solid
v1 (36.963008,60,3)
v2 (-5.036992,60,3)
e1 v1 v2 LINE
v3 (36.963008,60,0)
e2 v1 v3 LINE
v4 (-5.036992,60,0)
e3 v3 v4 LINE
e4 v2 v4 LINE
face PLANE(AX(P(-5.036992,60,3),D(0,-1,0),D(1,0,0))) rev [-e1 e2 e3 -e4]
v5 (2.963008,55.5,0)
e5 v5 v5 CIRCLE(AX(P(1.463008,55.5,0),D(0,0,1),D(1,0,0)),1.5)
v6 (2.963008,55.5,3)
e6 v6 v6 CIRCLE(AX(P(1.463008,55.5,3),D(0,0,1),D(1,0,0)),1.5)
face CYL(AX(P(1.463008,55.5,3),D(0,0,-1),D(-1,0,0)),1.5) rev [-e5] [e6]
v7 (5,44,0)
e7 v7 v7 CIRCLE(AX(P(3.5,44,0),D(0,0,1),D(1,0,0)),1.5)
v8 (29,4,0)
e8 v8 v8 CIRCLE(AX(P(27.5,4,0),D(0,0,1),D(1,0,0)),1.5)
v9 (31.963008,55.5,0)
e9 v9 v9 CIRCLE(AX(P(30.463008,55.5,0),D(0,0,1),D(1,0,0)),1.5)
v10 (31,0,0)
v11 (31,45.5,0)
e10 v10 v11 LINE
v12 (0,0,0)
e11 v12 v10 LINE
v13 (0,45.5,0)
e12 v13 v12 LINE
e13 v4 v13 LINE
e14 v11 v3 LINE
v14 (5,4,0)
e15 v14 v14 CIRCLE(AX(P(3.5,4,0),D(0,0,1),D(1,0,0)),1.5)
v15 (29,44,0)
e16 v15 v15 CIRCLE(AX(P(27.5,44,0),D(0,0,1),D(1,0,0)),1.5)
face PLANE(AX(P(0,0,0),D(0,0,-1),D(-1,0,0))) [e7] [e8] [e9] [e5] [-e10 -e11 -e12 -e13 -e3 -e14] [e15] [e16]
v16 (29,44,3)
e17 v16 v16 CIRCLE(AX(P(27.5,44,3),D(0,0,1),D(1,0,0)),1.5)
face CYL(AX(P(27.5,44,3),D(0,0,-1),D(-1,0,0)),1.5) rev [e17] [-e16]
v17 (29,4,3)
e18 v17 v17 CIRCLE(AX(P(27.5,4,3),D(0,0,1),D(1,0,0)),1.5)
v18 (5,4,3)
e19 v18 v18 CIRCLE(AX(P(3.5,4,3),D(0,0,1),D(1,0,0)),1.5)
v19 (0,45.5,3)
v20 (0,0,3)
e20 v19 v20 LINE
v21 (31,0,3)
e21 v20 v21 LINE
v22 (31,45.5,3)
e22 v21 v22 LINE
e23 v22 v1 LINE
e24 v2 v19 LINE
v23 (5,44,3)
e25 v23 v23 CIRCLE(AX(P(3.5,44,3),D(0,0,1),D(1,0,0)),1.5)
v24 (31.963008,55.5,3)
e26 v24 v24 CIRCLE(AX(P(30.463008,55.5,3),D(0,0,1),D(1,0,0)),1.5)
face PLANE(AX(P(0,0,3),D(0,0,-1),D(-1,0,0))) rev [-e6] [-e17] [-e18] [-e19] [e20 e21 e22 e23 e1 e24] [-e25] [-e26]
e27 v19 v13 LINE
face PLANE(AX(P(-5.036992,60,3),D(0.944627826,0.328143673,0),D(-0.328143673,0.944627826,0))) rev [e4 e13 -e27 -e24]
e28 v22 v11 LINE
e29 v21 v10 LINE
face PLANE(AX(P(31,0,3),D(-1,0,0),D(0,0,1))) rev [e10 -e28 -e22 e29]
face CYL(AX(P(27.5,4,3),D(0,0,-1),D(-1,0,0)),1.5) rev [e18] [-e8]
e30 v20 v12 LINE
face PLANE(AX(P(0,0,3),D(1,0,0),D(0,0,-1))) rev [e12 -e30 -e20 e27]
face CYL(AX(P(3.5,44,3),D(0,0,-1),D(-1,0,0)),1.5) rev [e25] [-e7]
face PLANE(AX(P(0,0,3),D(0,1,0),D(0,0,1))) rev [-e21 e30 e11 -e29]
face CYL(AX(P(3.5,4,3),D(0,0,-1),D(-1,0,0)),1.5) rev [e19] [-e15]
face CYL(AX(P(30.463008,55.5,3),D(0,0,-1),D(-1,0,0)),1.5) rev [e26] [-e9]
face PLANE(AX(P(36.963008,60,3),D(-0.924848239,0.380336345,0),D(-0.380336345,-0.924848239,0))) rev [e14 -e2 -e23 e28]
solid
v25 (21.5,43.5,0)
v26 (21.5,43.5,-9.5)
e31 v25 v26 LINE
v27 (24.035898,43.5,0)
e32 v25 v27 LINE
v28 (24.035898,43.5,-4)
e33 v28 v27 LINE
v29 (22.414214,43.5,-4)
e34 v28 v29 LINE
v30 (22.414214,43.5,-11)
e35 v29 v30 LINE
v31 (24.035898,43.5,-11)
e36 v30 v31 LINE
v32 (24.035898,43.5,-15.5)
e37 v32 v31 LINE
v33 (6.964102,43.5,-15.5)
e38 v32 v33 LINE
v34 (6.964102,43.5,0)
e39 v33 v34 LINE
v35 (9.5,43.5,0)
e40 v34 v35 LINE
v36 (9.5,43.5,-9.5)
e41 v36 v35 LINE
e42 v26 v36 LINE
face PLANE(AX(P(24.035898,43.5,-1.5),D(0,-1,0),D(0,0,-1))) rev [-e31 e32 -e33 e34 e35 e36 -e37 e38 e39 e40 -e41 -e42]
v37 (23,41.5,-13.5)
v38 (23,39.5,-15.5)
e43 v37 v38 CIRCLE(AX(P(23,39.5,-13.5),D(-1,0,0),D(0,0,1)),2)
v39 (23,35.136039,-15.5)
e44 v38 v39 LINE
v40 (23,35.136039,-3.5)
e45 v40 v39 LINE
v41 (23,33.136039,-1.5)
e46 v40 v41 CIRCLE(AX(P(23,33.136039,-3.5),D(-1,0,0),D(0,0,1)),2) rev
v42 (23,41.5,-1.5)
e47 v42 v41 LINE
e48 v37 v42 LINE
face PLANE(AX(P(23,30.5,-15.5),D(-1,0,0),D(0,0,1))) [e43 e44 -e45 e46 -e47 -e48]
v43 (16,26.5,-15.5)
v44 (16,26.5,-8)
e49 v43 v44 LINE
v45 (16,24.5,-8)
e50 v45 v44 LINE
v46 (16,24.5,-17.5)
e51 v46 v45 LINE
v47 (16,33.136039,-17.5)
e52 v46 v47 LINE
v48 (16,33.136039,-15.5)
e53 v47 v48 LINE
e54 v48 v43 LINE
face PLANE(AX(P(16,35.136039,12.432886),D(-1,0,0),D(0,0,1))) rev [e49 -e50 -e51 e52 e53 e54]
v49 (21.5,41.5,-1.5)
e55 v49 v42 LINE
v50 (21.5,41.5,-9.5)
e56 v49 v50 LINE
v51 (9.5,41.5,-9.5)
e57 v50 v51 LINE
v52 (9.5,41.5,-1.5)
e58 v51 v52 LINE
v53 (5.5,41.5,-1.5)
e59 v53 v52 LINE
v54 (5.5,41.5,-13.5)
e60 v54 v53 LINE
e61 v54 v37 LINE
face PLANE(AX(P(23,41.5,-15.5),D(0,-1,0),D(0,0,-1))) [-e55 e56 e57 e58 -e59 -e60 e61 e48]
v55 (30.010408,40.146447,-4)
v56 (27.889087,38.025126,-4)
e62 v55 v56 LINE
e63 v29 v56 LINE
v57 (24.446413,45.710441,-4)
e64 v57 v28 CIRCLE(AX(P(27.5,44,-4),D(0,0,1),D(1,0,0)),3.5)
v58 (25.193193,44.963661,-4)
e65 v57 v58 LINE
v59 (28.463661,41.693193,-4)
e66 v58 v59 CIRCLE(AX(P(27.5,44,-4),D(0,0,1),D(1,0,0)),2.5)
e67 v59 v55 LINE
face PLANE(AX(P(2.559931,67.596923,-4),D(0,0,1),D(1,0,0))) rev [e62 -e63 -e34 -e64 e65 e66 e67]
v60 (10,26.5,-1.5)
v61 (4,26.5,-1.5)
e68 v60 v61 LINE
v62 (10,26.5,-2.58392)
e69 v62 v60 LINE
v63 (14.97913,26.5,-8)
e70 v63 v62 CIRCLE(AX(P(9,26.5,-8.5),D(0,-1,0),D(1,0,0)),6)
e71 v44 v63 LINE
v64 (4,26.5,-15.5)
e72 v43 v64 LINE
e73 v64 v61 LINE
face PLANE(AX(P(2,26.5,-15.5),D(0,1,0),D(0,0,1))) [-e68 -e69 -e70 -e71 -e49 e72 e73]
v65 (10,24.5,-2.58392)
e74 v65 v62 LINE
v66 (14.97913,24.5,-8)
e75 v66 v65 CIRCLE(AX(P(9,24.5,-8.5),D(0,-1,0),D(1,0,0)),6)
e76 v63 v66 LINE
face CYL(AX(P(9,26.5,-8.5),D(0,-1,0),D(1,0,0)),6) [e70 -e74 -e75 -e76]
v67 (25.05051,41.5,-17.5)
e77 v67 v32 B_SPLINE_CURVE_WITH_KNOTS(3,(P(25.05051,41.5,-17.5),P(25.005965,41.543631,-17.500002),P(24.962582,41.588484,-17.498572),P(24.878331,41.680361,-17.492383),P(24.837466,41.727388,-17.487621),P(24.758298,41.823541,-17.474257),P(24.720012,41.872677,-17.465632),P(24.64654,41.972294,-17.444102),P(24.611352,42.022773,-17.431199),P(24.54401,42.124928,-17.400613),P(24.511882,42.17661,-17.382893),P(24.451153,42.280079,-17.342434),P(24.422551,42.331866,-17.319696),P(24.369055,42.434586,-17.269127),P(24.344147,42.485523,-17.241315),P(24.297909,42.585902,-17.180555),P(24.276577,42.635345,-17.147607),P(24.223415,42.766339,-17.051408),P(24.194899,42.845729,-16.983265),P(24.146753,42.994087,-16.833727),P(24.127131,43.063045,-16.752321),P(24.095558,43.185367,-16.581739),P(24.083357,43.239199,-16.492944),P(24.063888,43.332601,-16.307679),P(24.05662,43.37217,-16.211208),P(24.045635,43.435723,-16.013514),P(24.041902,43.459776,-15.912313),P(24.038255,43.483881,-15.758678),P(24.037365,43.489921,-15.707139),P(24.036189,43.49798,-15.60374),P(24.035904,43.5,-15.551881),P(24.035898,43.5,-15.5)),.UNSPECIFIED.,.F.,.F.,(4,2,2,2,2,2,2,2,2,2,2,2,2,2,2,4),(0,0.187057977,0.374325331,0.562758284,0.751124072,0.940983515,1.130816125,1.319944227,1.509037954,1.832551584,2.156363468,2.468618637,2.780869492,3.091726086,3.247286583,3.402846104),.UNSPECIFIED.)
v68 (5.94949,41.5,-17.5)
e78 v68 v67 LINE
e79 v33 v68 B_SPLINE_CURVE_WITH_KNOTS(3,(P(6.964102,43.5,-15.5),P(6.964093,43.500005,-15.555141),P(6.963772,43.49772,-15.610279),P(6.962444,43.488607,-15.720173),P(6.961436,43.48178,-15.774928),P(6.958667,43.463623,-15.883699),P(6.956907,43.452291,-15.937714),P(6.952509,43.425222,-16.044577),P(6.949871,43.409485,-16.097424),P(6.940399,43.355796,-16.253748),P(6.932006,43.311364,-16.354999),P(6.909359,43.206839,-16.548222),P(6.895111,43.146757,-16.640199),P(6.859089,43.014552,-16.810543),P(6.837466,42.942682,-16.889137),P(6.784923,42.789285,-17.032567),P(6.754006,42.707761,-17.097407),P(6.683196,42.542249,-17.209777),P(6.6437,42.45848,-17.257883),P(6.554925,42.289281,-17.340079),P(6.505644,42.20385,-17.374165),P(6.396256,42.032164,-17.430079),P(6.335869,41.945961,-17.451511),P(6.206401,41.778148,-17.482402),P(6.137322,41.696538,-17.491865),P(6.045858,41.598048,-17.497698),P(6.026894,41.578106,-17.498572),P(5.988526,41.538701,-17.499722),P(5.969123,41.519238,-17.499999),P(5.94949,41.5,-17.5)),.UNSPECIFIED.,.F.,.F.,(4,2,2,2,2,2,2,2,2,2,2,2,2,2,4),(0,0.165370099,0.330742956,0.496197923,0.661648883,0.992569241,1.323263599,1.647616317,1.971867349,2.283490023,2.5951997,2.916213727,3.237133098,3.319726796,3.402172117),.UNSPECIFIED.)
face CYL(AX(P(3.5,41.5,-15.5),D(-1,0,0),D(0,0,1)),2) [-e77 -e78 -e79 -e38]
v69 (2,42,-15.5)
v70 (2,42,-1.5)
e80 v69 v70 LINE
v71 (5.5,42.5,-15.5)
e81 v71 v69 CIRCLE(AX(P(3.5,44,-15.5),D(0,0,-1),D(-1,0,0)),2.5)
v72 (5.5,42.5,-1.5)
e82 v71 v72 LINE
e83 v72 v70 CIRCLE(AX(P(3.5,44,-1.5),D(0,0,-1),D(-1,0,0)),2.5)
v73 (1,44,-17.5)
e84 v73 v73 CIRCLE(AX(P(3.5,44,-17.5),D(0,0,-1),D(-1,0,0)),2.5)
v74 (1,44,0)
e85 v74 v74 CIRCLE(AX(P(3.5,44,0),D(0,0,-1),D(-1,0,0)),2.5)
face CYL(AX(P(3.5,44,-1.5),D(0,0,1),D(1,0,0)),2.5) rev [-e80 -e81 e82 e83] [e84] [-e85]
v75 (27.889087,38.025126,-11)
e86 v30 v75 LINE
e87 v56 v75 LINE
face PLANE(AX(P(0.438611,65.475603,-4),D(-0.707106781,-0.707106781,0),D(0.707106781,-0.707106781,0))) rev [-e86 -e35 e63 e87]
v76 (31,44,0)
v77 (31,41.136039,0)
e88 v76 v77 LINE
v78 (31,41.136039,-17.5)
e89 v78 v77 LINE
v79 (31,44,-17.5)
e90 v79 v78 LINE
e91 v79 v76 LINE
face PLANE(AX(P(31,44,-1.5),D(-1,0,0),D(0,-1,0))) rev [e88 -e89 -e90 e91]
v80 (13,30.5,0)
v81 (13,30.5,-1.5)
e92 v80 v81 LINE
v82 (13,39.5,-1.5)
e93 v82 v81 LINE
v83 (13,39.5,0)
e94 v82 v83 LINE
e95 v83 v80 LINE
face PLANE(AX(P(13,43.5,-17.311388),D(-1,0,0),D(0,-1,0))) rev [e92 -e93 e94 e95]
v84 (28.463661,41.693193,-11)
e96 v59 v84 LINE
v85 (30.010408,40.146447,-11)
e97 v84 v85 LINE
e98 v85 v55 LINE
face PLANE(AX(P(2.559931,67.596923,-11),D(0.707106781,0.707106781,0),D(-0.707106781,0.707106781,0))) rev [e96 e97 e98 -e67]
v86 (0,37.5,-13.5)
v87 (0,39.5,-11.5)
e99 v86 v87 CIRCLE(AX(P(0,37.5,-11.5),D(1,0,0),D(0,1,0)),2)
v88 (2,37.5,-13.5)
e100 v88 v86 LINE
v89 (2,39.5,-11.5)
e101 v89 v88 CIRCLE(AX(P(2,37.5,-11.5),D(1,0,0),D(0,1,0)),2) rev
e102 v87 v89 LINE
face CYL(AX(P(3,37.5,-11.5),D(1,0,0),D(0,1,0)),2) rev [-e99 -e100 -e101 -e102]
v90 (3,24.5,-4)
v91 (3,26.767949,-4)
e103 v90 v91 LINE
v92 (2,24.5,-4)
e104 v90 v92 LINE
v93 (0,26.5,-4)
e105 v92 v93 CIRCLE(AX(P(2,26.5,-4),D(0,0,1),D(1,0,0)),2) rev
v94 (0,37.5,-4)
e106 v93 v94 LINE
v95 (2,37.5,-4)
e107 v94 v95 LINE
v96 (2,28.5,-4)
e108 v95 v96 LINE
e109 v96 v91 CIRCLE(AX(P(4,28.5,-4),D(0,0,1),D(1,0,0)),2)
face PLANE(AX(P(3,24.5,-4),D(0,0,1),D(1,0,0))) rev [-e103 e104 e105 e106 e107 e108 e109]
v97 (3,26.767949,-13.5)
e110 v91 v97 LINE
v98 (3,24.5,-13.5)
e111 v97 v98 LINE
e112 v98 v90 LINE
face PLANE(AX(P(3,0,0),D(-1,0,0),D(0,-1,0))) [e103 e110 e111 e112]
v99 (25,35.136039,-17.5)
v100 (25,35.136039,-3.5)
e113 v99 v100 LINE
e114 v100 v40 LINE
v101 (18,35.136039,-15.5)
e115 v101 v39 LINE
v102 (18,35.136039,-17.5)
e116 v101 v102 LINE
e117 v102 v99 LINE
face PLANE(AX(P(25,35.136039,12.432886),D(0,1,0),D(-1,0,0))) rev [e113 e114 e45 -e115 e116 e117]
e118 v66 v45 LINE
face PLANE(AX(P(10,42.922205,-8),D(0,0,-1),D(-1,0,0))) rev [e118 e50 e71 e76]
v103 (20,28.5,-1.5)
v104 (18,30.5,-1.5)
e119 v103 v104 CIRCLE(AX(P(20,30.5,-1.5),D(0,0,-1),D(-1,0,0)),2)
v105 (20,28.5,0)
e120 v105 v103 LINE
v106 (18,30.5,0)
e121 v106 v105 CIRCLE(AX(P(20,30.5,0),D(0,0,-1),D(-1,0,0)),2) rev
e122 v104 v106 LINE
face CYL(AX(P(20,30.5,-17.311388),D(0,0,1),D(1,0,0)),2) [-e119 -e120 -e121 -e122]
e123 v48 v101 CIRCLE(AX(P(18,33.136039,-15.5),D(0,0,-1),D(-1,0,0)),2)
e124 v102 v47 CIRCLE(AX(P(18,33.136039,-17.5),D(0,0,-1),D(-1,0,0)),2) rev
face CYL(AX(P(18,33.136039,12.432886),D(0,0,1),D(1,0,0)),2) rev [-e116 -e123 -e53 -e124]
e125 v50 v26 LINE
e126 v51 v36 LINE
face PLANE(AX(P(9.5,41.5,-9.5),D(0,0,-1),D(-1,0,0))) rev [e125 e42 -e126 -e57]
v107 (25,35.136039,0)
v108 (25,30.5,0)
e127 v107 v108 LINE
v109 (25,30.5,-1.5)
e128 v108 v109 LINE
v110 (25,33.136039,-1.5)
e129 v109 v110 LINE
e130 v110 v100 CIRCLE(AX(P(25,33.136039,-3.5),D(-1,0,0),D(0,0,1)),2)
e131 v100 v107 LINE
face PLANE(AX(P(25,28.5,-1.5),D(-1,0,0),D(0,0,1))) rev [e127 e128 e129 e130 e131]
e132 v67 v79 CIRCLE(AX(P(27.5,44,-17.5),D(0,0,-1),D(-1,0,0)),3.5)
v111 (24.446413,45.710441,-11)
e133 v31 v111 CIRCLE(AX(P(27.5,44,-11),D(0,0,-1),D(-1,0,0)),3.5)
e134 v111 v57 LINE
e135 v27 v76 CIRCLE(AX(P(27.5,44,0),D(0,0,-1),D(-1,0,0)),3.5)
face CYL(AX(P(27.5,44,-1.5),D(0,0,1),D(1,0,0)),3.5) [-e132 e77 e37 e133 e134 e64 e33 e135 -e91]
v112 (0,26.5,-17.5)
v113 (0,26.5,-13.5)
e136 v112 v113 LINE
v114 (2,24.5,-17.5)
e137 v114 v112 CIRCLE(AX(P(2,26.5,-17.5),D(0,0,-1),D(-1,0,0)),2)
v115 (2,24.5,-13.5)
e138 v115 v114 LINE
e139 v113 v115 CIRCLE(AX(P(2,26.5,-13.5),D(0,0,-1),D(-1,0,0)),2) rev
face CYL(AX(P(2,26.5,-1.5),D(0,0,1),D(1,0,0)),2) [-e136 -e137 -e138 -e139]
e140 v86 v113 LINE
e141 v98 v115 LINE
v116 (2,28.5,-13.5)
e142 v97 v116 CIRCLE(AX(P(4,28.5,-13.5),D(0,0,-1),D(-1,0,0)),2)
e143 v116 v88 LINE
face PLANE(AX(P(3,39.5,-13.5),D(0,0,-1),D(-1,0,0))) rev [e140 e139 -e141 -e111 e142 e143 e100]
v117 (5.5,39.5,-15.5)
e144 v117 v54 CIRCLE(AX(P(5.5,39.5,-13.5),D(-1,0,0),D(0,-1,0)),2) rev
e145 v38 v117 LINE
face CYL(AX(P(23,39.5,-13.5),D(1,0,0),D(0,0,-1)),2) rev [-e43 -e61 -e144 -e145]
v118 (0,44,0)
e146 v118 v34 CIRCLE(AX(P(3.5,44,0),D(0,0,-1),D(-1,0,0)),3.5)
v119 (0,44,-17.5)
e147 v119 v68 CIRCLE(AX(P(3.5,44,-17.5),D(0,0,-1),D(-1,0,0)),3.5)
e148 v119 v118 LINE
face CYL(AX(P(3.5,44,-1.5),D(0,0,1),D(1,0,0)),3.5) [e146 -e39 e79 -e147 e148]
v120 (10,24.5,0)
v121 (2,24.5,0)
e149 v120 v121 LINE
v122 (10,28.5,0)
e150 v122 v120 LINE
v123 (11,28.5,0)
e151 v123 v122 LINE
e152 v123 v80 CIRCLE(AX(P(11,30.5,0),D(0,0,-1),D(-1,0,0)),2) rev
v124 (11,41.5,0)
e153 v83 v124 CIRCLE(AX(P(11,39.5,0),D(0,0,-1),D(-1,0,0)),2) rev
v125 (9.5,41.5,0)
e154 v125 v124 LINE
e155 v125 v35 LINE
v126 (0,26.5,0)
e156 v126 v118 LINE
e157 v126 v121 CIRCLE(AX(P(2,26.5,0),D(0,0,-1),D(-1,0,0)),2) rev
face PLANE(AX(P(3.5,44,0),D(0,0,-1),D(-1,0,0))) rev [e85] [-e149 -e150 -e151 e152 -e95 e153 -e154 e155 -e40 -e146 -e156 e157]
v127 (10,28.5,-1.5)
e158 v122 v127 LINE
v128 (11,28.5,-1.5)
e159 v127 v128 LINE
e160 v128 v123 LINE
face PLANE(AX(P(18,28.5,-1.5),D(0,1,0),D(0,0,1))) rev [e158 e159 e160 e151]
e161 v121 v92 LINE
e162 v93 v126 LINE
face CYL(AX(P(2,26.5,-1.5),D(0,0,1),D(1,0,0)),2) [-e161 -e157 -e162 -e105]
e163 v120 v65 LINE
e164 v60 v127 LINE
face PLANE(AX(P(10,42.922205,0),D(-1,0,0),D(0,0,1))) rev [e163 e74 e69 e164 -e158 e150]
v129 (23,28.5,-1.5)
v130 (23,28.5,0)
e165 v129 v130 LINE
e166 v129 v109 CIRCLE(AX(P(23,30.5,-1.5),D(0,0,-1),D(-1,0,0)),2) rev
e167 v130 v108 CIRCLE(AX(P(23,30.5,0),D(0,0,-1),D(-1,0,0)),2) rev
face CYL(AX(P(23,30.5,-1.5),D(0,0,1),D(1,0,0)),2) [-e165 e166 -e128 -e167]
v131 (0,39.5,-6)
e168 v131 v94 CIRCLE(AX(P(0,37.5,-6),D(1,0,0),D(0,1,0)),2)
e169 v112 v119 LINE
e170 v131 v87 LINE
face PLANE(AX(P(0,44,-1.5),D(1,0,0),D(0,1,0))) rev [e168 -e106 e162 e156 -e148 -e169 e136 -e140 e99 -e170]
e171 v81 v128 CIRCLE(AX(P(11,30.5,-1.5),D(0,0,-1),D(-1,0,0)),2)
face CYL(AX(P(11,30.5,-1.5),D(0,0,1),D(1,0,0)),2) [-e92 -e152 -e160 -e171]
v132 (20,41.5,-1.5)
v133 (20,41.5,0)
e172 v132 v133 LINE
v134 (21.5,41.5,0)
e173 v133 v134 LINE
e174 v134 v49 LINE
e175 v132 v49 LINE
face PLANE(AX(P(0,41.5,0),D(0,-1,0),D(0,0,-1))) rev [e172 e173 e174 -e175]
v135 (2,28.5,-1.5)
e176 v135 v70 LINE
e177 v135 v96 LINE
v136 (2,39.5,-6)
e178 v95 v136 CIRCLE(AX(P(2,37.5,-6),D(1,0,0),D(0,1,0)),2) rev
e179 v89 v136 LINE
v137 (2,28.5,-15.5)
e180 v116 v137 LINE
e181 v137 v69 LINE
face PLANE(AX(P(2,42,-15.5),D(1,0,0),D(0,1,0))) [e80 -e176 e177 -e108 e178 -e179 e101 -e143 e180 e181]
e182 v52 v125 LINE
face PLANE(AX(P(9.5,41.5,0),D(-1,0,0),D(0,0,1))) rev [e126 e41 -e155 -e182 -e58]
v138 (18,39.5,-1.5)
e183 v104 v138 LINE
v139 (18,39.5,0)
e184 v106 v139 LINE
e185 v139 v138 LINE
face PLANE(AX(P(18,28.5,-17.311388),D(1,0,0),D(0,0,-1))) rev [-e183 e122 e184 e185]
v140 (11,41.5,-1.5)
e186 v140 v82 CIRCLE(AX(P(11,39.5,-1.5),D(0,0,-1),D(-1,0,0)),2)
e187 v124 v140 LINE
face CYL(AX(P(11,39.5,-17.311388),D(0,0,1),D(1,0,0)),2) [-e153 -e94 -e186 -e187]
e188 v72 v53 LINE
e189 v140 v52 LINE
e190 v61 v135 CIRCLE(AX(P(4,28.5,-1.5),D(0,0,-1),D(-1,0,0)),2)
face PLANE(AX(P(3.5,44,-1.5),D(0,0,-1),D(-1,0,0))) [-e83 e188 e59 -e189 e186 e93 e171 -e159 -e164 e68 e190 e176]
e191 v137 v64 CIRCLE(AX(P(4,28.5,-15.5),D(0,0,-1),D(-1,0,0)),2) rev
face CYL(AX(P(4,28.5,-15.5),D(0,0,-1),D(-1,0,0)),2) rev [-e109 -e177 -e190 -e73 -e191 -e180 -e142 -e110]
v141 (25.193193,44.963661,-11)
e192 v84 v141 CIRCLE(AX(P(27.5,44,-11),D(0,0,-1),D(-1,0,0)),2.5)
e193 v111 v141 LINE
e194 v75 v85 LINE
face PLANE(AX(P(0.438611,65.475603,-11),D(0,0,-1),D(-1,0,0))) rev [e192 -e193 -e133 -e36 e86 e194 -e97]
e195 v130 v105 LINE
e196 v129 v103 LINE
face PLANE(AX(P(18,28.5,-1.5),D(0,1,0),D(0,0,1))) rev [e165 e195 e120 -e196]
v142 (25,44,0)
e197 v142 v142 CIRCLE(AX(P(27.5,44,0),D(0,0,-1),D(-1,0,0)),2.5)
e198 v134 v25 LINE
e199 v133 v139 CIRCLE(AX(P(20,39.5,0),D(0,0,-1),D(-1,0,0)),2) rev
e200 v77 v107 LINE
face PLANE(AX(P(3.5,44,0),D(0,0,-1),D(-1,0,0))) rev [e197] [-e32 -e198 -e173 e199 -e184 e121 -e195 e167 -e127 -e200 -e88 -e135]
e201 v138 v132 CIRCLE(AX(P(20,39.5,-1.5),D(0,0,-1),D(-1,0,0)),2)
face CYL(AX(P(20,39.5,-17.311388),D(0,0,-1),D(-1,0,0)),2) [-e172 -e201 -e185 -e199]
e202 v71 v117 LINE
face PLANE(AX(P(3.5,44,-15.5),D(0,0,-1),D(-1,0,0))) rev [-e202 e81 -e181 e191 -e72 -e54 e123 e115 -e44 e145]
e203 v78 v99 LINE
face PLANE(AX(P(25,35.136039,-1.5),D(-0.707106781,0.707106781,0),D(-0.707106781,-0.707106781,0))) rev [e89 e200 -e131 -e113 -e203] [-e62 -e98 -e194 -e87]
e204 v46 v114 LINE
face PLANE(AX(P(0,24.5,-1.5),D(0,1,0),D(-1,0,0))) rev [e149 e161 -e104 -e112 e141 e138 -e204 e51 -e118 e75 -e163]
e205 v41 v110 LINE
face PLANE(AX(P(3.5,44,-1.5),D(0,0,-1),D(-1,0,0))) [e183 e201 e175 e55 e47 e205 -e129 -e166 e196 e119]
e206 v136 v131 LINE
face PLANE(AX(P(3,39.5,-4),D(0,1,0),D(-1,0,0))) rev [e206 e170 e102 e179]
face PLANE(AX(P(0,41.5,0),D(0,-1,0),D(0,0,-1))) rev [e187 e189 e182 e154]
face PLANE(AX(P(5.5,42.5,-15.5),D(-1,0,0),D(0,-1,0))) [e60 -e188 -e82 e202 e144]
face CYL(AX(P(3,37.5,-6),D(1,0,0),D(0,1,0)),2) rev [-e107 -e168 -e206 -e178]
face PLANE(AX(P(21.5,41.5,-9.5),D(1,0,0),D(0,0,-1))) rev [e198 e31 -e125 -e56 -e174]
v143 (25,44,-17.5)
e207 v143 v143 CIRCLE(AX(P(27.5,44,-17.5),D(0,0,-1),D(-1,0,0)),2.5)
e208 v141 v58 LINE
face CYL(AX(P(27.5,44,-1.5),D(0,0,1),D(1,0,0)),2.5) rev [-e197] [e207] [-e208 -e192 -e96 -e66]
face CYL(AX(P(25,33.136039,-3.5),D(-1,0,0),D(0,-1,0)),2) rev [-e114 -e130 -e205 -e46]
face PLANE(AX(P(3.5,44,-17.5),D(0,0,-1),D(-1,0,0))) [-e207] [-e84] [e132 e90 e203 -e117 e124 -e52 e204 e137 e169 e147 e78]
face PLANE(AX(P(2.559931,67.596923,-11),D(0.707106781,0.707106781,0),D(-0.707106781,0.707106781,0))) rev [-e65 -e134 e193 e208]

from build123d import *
from build123d.topology import SkipClean

# Parameters (mm, degrees)
SKETCH1_R           = 1.5
BOSS_EXTRUDE1_DEPTH = 3
SKETCH2_R           = 2.5
BOSS_EXTRUDE2_DEPTH = 1.5
SKETCH5_R           = 2.5
BOSS_EXTRUDE5_DEPTH = 14
SKETCH6_R           = 2.5
BOSS_EXTRUDE6_DEPTH = 2
SKETCH8_W           = 9.5
SKETCH8_H           = 15
CUT_EXTRUDE1_DEPTH  = 3
CUT_EXTRUDE2_REACH  = 56.155
SKETCH9_W           = 12
SKETCH9_H           = 8
SKETCH11_W          = 8
SKETCH11_H          = 4
CUT_EXTRUDE4_DEPTH  = 2
SKETCH13_W          = 5
SKETCH13_H          = 15
CUT_EXTRUDE7_DEPTH  = 1.5
SKETCH15_W          = 12
SKETCH15_H          = 9.5
CUT_EXTRUDE8_DEPTH  = 2
SKETCH16_W          = 7
SKETCH16_H          = 3
CUT_EXTRUDE9_DEPTH  = 72.346897019
FILLET1_R           = 2
CUT_EXTRUDE11_REACH = 75.393
SKETCH21_W          = 9
SKETCH21_H          = 10.636038969
SKETCH23_R          = 6
BOSS_EXTRUDE7_DEPTH = 2
FILLET2_R           = 2


with BuildPart() as part:
    # Sketch1 → Boss-Extrude1 (new body)
    with BuildSketch(Plane.XY):
        Polygon((0, 0), (31, 0), (31, 45.5), (36.963007518, 60), (-5.036992482, 60), (0, 45.5), align=None)
        with Locations((30.463007518, 55.5)):
            Circle(SKETCH1_R, mode=Mode.SUBTRACT)
        with Locations((27.5, 44)):
            Circle(SKETCH1_R, mode=Mode.SUBTRACT)
        with Locations((27.5, 4)):
            Circle(SKETCH1_R, mode=Mode.SUBTRACT)
        with Locations((3.5, 4)):
            Circle(SKETCH1_R, mode=Mode.SUBTRACT)
        with Locations((3.5, 44)):
            Circle(SKETCH1_R, mode=Mode.SUBTRACT)
        with Locations((1.463007518, 55.5)):
            Circle(SKETCH1_R, mode=Mode.SUBTRACT)
    extrude(amount=BOSS_EXTRUDE1_DEPTH)


with BuildPart() as body_2:
    # Sketch2 → Boss-Extrude2 (new body)
    with BuildSketch(Plane(origin=(0, 0, 0), x_dir=(-1, 0, 0), z_dir=(0, 0, -1))):
        with BuildLine():
            Line((0, 24.5), (0, 44))
            ThreePointArc((0, 44), (-3.750643519, 47.491013868), (-6.964101615, 43.5))
            Line((-6.964101615, 43.5), (-24.035898385, 43.5))
            ThreePointArc((-24.035898385, 43.5), (-27.249356481, 47.491013868), (-31, 44))
            Line((-31, 44), (-31, 41.136038969))
            Line((-31, 41.136038969), (-25, 35.136038969))
            Line((-25, 35.136038969), (-25, 28.5))
            Line((-25, 28.5), (-18, 28.5))
            Line((-18, 28.5), (-18, 24.5))
            Line((-18, 24.5), (0, 24.5))
        make_face()
        with Locations((-27.5, 44)):
            Circle(SKETCH2_R, mode=Mode.SUBTRACT)
        with Locations((-3.5, 44)):
            Circle(SKETCH2_R, mode=Mode.SUBTRACT)
    extrude(amount=BOSS_EXTRUDE2_DEPTH)

    # Sketch5 → Boss-Extrude5 (add)
    with SkipClean():  # the faces are left unmerged after this step: merging them gives an invalid solid
        with BuildSketch(Plane(origin=(0, 0, -1.5), x_dir=(-1, 0, 0), z_dir=(0, 0, -1))):
            with BuildLine():
                Line((-6.964101615, 43.5), (-24.035898385, 43.5))
                ThreePointArc((-24.035898385, 43.5), (-27.249356481, 47.491013868), (-31, 44))
                Line((-31, 44), (-31, 41.136038969))
                Line((-31, 41.136038969), (-25, 35.136038969))
                Line((-25, 35.136038969), (-25, 28.5))
                Line((-25, 28.5), (-18, 28.5))
                Line((-18, 28.5), (-18, 24.5))
                Line((-18, 24.5), (0, 24.5))
                Line((0, 24.5), (0, 44))
                ThreePointArc((0, 44), (-3.750643519, 47.491013868), (-6.964101615, 43.5))
            make_face()
            with Locations((-27.5, 44)):
                Circle(SKETCH5_R, mode=Mode.SUBTRACT)
            with BuildLine():
                Line((-23, 41.5), (-5.5, 41.5))
                Line((-5.5, 41.5), (-5.5, 42.5))
                ThreePointArc((-5.5, 42.5), (-3.146446609, 46.474873734), (-2, 42))
                Line((-2, 42), (-2, 26.5))
                Line((-2, 26.5), (-16, 26.5))
                Line((-16, 26.5), (-16, 30.5))
                Line((-16, 30.5), (-23, 30.5))
                Line((-23, 30.5), (-23, 41.5))
            make_face(mode=Mode.SUBTRACT)
        extrude(amount=BOSS_EXTRUDE5_DEPTH)

    # Sketch6 → Boss-Extrude6 (add)
    with SkipClean():  # the faces are left unmerged after this step: merging them gives an invalid solid
        with BuildSketch(Plane(origin=(0, 0, -15.5), x_dir=(-1, 0, 0), z_dir=(0, 0, -1))):
            with BuildLine():
                Line((-6.964101615, 43.5), (-24.035898385, 43.5))
                ThreePointArc((-24.035898385, 43.5), (-27.249356481, 47.491013868), (-31, 44))
                Line((-31, 44), (-31, 41.136038969))
                Line((-31, 41.136038969), (-25, 35.136038969))
                Line((-25, 35.136038969), (-25, 28.5))
                Line((-25, 28.5), (-18, 28.5))
                Line((-18, 28.5), (-18, 24.5))
                Line((-18, 24.5), (0, 24.5))
                Line((0, 24.5), (0, 44))
                ThreePointArc((0, 44), (-3.750643519, 47.491013868), (-6.964101615, 43.5))
            make_face()
            with Locations((-3.5, 44)):
                Circle(SKETCH6_R, mode=Mode.SUBTRACT)
            with Locations((-27.5, 44)):
                Circle(SKETCH6_R, mode=Mode.SUBTRACT)
        extrude(amount=BOSS_EXTRUDE6_DEPTH)

    # Sketch8 → Cut-Extrude1 (cut)
    with SkipClean():  # the faces are left unmerged after this step: merging them gives an invalid solid
        with BuildSketch(Plane.ZY):
            with Locations((-8.75, 32)):
                Rectangle(SKETCH8_W, SKETCH8_H)
        extrude(amount=-CUT_EXTRUDE1_DEPTH, mode=Mode.SUBTRACT)

    # Cut-Extrude2: up to this face of the body (flat: up to its plane)
    cut_extrude2_end = Plane(body_2.part.faces().sort_by_distance((21.5, 28.5, -8.5))[0])
    # Sketch9 → Cut-Extrude2 (cut, up to the picked face)
    with BuildSketch(Plane.XZ.offset(-24.5), mode=Mode.PRIVATE) as cut_extrude2_sk1:
        with Locations((16, -4)):
            Rectangle(SKETCH9_W, SKETCH9_H)
    cut_extrude2_tool1 = split(extrude(cut_extrude2_sk1.sketch, amount=-CUT_EXTRUDE2_REACH, mode=Mode.PRIVATE), bisect_by=cut_extrude2_end, keep=Keep.BOTH, mode=Mode.PRIVATE)
    add(cut_extrude2_tool1.solids().sort_by(Axis((16, 24.5, -4), (0, 1, 0)))[0], mode=Mode.SUBTRACT)

    # Sketch11 → Cut-Extrude4 (cut)
    with SkipClean():  # the faces are left unmerged after this step: merging them gives an invalid solid
        with BuildSketch(Plane(origin=(25, 0, 0), x_dir=(0, 0, -1), z_dir=(1, 0, 0))):
            with Locations((8, 32.5)):
                Rectangle(SKETCH11_W, SKETCH11_H)
        extrude(amount=-CUT_EXTRUDE4_DEPTH, mode=Mode.SUBTRACT)

    # Sketch13 → Cut-Extrude7 (cut)
    with SkipClean():  # the faces are left unmerged after this step: merging them gives an invalid solid
        with BuildSketch(Plane.XY):
            with Locations((15.5, 36)):
                Rectangle(SKETCH13_W, SKETCH13_H)
        extrude(amount=-CUT_EXTRUDE7_DEPTH, mode=Mode.SUBTRACT)

    # Sketch15 → Cut-Extrude8 (cut)
    with SkipClean():  # the faces are left unmerged after this step: merging them gives an invalid solid
        with BuildSketch(Plane(origin=(0, 43.5, 0), x_dir=(1, 0, 0), z_dir=(0, 1, 0))):
            with Locations((15.5, 4.75)):
                Rectangle(SKETCH15_W, SKETCH15_H)
        extrude(amount=-CUT_EXTRUDE8_DEPTH, mode=Mode.SUBTRACT)

    # Sketch16 → Cut-Extrude9 (cut, through all)
    with SkipClean():  # the faces are left unmerged after this step: merging them gives an invalid solid
        with BuildSketch(Plane(origin=(-5.068019485, 5.068019485, 0), x_dir=(0, 0, -1), z_dir=(0.7071067811865467, -0.7071067811865485, 0))):
            with Locations((7.5, 48.108387387)):
                Rectangle(SKETCH16_W, SKETCH16_H)
        extrude(amount=-CUT_EXTRUDE9_DEPTH, mode=Mode.SUBTRACT)

    # Fillet1
    # the kernel refuses this fillet: 2 mm, written as the material it adds along each edge
    with BuildSketch(Plane(origin=(2, 26.5, -1.5), x_dir=(1, 0, 0), z_dir=(0, 0, -1))) as fillet1_piece_1_section:
        with BuildLine():
            CenterArc((FILLET1_R, -FILLET1_R), FILLET1_R, 90, 90)
            Line((0, -FILLET1_R), (0, 0))
            Line((0, 0), (FILLET1_R, 0))
        make_face()
    fillet1_piece_1 = extrude(amount=7.5, mode=Mode.PRIVATE)
    fillet1_piece_1 = split(fillet1_piece_1, bisect_by=Plane(origin=(3, 26.579369185, -2.75), z_dir=(1, 0, 0)), keep=Keep.TOP, mode=Mode.PRIVATE)
    add(fillet1_piece_1)
    with BuildSketch(Plane(origin=(2, 26.5, -1.5), x_dir=(1, 0, 0), z_dir=(0, 0, -1))) as fillet1_piece_2:
        with BuildLine():
            CenterArc((FILLET1_R, -FILLET1_R), FILLET1_R, 90, 90)
            Line((0, -FILLET1_R), (0, 0))
            Line((0, 0), (FILLET1_R, 0))
        make_face()
    extrude(amount=2.5)
    with BuildSketch(Plane(origin=(18, 28.5, -8), x_dir=(0, -1, 0), z_dir=(0, 0, -1))) as fillet1_piece_3:
        with BuildLine():
            CenterArc((FILLET1_R, -FILLET1_R), FILLET1_R, 90, 90)
            Line((0, -FILLET1_R), (0, 0))
            Line((0, 0), (FILLET1_R, 0))
        make_face()
    extrude(amount=7.5)
    with BuildSketch(Plane(origin=(28, 41.5, -15.5), x_dir=(0, 0, 1), z_dir=(-1, 0, 0))) as fillet1_piece_4:
        with BuildLine():
            CenterArc((FILLET1_R, -FILLET1_R), FILLET1_R, 90, 90)
            Line((0, -FILLET1_R), (0, 0))
            Line((0, 0), (FILLET1_R, 0))
        make_face()
    extrude(amount=22.5)
    with BuildSketch(Plane(origin=(2, 26.5, -8.5), x_dir=(1, 0, 0), z_dir=(0, 0, -1))) as fillet1_piece_5_section:
        with BuildLine():
            CenterArc((FILLET1_R, -FILLET1_R), FILLET1_R, 90, 90)
            Line((0, -FILLET1_R), (0, 0))
            Line((0, 0), (FILLET1_R, 0))
        make_face()
    fillet1_piece_5 = extrude(amount=7, mode=Mode.PRIVATE)
    fillet1_piece_5 = split(fillet1_piece_5, bisect_by=Plane(origin=(3, 26.579369185, -11), z_dir=(1, 0, 0)), keep=Keep.TOP, mode=Mode.PRIVATE)
    add(fillet1_piece_5)
    with BuildSketch(Plane(origin=(2, 26.5, -13.5), x_dir=(1, 0, 0), z_dir=(0, 0, -1)), Plane(origin=(18, 28.5, -15.5), x_dir=(0, -1, 0), z_dir=(0, 0, -1))) as fillet1_piece_6:
        with BuildLine():
            CenterArc((FILLET1_R, -FILLET1_R), FILLET1_R, 90, 90)
            Line((0, -FILLET1_R), (0, 0))
            Line((0, 0), (FILLET1_R, 0))
        make_face()
    extrude(amount=2)
    # the kernel refuses this fillet: 2 mm, written as the material it takes off along each edge
    with BuildSketch(Plane(origin=(0, 24.5, -1.5), x_dir=(0, 1, 0), z_dir=(0, 0, -1))) as fillet1_2_piece_1:
        with BuildLine():
            CenterArc((FILLET1_R, FILLET1_R), FILLET1_R, 180, 90)
            Line((0, FILLET1_R), (0, 0))
            Line((0, 0), (FILLET1_R, 0))
        make_face()
    extrude(amount=7.5, mode=Mode.SUBTRACT)
    with BuildSketch(Plane(origin=(0, 24.5, -15.5), x_dir=(0, 1, 0), z_dir=(0, 0, -1)), Plane(origin=(18, 24.5, -15.5), x_dir=(-1, 0, 0), z_dir=(0, 0, -1)), Plane(origin=(0, 24.5, -8.5), x_dir=(0, 1, 0), z_dir=(0, 0, -1))) as fillet1_2_piece_2:
        with BuildLine():
            CenterArc((FILLET1_R, FILLET1_R), FILLET1_R, 180, 90)
            Line((0, FILLET1_R), (0, 0))
            Line((0, 0), (FILLET1_R, 0))
        make_face()
    extrude(amount=7, mode=Mode.SUBTRACT)
    with BuildSketch(Plane(origin=(18, 24.5, -3), x_dir=(-1, 0, 0), z_dir=(0, 0, -1))) as fillet1_2_piece_3:
        with BuildLine():
            CenterArc((FILLET1_R, FILLET1_R), FILLET1_R, 180, 90)
            Line((0, FILLET1_R), (0, 0))
            Line((0, 0), (FILLET1_R, 0))
        make_face()
    extrude(amount=12.5, mode=Mode.SUBTRACT)
    with BuildSketch(Plane(origin=(25, 28.5, -1.5), x_dir=(-1, 0, 0), z_dir=(0, 0, -1))) as fillet1_2_piece_4:
        with BuildLine():
            CenterArc((FILLET1_R, FILLET1_R), FILLET1_R, 180, 90)
            Line((0, FILLET1_R), (0, 0))
            Line((0, 0), (FILLET1_R, 0))
        make_face()
    extrude(amount=14, mode=Mode.SUBTRACT)
    with BuildSketch(Plane(origin=(13, 28.5, 5), x_dir=(-1, 0, 0), z_dir=(0, 0, -1)), Plane(origin=(18, 41.5, 5), x_dir=(1, 0, 0), z_dir=(0, 0, -1))) as fillet1_2_piece_5:
        with BuildLine():
            CenterArc((FILLET1_R, FILLET1_R), FILLET1_R, 180, 90)
            Line((0, FILLET1_R), (0, 0))
            Line((0, 0), (FILLET1_R, 0))
        make_face()
    extrude(amount=11.5, mode=Mode.SUBTRACT)
    with BuildSketch(Plane(origin=(18, 28.5, 5), x_dir=(0, 1, 0), z_dir=(0, 0, -1)), Plane(origin=(25, 28.5, 5), x_dir=(-1, 0, 0), z_dir=(0, 0, -1)), Plane(origin=(0, 24.5, 5), x_dir=(0, 1, 0), z_dir=(0, 0, -1))) as fillet1_2_piece_6:
        with BuildLine():
            CenterArc((FILLET1_R, FILLET1_R), FILLET1_R, 180, 90)
            Line((0, FILLET1_R), (0, 0))
            Line((0, 0), (FILLET1_R, 0))
        make_face()
    extrude(amount=6.5, mode=Mode.SUBTRACT)
    with BuildSketch(Plane(origin=(13, 41.5, -6.5), x_dir=(0, -1, 0), z_dir=(0, 0, 1))) as fillet1_2_piece_7:
        with BuildLine():
            CenterArc((FILLET1_R, -FILLET1_R), FILLET1_R, 90, 90)
            Line((0, -FILLET1_R), (0, 0))
            Line((0, 0), (FILLET1_R, 0))
        make_face()
    extrude(amount=11.5, mode=Mode.SUBTRACT)
    with BuildSketch(Plane(origin=(16, 30.5, 3.5), x_dir=(0, -1, 0), z_dir=(0, 0, -1))) as fillet1_2_piece_8:
        with BuildLine():
            CenterArc((FILLET1_R, -FILLET1_R), FILLET1_R, 90, 90)
            Line((0, -FILLET1_R), (0, 0))
            Line((0, 0), (FILLET1_R, 0))
        make_face()
    extrude(amount=19, mode=Mode.SUBTRACT)
    with BuildSketch(Plane(origin=(1.964101615, 43.5, -17.5), x_dir=(0, -1, 0), z_dir=(1, 0, 0))) as fillet1_2_piece_9_section:
        with BuildLine():
            CenterArc((FILLET1_R, -FILLET1_R), FILLET1_R, 90, 90)
            Line((0, -FILLET1_R), (0, 0))
            Line((0, 0), (FILLET1_R, 0))
        make_face()
    fillet1_2_piece_9 = extrude(amount=27.07179677, mode=Mode.PRIVATE)
    fillet1_2_piece_9 = fillet1_2_piece_9 - Plane(origin=(3.5, 44, -17.056366893), x_dir=(-1, 0, 0), z_dir=(0, 0, 1)) * Cylinder(3.5, 63, mode=Mode.PRIVATE)
    fillet1_2_piece_9 = fillet1_2_piece_9 - Plane(origin=(27.5, 44, -17.056366893), x_dir=(-0.9897433186107873, -0.14285714285714077, 0), z_dir=(0, 0, 1)) * Cylinder(3.5, 63, mode=Mode.PRIVATE)
    add(fillet1_2_piece_9, mode=Mode.SUBTRACT)
    with BuildSketch(Plane(origin=(25, 28.5, -15.5), x_dir=(0, 1, 0), z_dir=(0, 0, -1))) as fillet1_2_piece_10:
        with BuildLine():
            CenterArc((FILLET1_R, -FILLET1_R), FILLET1_R, 90, 90)
            Line((0, -FILLET1_R), (0, 0))
            Line((0, 0), (FILLET1_R, 0))
        make_face()
    extrude(amount=7, mode=Mode.SUBTRACT)

    # Cut-Extrude11: up to this face of the body (flat: up to its plane)
    cut_extrude11_end = Plane(body_2.part.faces().sort_by_distance((7.302519528, 34.317007669, -1.5))[0])
    # Sketch21 → Cut-Extrude11 (cut, up to the picked face)
    with BuildSketch(Plane(origin=(0, 0, -17.5), x_dir=(-1, 0, 0), z_dir=(0, 0, -1)), mode=Mode.PRIVATE) as cut_extrude11_sk1:
        with Locations((-20.5, 29.818019485)):
            Rectangle(SKETCH21_W, SKETCH21_H)
    cut_extrude11_tool1 = split(extrude(cut_extrude11_sk1.sketch, amount=-CUT_EXTRUDE11_REACH, mode=Mode.PRIVATE), bisect_by=cut_extrude11_end, keep=Keep.BOTH, mode=Mode.PRIVATE)
    add(cut_extrude11_tool1.solids().sort_by(Axis((20.5, 29.818019, -17.5), (0, 0, 1)))[0], mode=Mode.SUBTRACT)

    # Sketch23 → Boss-Extrude7 (add)
    with BuildSketch(Plane.XZ.offset(-24.5)):
        with Locations((9, -8.5)):
            Circle(SKETCH23_R)
    extrude(amount=-BOSS_EXTRUDE7_DEPTH)

    # Fillet2
    fillet2_edges = [body_2.edges().sort_by_distance(p)[0] for p in [
        (1, 39.5, -13.5),
        (1, 39.5, -4),
        (16, 35.136038969, -16.5),
        (24, 35.136038969, -1.5),
    ]]
    fillet(fillet2_edges, radius=FILLET2_R)


solid = Compound([part.part, body_2.part])
